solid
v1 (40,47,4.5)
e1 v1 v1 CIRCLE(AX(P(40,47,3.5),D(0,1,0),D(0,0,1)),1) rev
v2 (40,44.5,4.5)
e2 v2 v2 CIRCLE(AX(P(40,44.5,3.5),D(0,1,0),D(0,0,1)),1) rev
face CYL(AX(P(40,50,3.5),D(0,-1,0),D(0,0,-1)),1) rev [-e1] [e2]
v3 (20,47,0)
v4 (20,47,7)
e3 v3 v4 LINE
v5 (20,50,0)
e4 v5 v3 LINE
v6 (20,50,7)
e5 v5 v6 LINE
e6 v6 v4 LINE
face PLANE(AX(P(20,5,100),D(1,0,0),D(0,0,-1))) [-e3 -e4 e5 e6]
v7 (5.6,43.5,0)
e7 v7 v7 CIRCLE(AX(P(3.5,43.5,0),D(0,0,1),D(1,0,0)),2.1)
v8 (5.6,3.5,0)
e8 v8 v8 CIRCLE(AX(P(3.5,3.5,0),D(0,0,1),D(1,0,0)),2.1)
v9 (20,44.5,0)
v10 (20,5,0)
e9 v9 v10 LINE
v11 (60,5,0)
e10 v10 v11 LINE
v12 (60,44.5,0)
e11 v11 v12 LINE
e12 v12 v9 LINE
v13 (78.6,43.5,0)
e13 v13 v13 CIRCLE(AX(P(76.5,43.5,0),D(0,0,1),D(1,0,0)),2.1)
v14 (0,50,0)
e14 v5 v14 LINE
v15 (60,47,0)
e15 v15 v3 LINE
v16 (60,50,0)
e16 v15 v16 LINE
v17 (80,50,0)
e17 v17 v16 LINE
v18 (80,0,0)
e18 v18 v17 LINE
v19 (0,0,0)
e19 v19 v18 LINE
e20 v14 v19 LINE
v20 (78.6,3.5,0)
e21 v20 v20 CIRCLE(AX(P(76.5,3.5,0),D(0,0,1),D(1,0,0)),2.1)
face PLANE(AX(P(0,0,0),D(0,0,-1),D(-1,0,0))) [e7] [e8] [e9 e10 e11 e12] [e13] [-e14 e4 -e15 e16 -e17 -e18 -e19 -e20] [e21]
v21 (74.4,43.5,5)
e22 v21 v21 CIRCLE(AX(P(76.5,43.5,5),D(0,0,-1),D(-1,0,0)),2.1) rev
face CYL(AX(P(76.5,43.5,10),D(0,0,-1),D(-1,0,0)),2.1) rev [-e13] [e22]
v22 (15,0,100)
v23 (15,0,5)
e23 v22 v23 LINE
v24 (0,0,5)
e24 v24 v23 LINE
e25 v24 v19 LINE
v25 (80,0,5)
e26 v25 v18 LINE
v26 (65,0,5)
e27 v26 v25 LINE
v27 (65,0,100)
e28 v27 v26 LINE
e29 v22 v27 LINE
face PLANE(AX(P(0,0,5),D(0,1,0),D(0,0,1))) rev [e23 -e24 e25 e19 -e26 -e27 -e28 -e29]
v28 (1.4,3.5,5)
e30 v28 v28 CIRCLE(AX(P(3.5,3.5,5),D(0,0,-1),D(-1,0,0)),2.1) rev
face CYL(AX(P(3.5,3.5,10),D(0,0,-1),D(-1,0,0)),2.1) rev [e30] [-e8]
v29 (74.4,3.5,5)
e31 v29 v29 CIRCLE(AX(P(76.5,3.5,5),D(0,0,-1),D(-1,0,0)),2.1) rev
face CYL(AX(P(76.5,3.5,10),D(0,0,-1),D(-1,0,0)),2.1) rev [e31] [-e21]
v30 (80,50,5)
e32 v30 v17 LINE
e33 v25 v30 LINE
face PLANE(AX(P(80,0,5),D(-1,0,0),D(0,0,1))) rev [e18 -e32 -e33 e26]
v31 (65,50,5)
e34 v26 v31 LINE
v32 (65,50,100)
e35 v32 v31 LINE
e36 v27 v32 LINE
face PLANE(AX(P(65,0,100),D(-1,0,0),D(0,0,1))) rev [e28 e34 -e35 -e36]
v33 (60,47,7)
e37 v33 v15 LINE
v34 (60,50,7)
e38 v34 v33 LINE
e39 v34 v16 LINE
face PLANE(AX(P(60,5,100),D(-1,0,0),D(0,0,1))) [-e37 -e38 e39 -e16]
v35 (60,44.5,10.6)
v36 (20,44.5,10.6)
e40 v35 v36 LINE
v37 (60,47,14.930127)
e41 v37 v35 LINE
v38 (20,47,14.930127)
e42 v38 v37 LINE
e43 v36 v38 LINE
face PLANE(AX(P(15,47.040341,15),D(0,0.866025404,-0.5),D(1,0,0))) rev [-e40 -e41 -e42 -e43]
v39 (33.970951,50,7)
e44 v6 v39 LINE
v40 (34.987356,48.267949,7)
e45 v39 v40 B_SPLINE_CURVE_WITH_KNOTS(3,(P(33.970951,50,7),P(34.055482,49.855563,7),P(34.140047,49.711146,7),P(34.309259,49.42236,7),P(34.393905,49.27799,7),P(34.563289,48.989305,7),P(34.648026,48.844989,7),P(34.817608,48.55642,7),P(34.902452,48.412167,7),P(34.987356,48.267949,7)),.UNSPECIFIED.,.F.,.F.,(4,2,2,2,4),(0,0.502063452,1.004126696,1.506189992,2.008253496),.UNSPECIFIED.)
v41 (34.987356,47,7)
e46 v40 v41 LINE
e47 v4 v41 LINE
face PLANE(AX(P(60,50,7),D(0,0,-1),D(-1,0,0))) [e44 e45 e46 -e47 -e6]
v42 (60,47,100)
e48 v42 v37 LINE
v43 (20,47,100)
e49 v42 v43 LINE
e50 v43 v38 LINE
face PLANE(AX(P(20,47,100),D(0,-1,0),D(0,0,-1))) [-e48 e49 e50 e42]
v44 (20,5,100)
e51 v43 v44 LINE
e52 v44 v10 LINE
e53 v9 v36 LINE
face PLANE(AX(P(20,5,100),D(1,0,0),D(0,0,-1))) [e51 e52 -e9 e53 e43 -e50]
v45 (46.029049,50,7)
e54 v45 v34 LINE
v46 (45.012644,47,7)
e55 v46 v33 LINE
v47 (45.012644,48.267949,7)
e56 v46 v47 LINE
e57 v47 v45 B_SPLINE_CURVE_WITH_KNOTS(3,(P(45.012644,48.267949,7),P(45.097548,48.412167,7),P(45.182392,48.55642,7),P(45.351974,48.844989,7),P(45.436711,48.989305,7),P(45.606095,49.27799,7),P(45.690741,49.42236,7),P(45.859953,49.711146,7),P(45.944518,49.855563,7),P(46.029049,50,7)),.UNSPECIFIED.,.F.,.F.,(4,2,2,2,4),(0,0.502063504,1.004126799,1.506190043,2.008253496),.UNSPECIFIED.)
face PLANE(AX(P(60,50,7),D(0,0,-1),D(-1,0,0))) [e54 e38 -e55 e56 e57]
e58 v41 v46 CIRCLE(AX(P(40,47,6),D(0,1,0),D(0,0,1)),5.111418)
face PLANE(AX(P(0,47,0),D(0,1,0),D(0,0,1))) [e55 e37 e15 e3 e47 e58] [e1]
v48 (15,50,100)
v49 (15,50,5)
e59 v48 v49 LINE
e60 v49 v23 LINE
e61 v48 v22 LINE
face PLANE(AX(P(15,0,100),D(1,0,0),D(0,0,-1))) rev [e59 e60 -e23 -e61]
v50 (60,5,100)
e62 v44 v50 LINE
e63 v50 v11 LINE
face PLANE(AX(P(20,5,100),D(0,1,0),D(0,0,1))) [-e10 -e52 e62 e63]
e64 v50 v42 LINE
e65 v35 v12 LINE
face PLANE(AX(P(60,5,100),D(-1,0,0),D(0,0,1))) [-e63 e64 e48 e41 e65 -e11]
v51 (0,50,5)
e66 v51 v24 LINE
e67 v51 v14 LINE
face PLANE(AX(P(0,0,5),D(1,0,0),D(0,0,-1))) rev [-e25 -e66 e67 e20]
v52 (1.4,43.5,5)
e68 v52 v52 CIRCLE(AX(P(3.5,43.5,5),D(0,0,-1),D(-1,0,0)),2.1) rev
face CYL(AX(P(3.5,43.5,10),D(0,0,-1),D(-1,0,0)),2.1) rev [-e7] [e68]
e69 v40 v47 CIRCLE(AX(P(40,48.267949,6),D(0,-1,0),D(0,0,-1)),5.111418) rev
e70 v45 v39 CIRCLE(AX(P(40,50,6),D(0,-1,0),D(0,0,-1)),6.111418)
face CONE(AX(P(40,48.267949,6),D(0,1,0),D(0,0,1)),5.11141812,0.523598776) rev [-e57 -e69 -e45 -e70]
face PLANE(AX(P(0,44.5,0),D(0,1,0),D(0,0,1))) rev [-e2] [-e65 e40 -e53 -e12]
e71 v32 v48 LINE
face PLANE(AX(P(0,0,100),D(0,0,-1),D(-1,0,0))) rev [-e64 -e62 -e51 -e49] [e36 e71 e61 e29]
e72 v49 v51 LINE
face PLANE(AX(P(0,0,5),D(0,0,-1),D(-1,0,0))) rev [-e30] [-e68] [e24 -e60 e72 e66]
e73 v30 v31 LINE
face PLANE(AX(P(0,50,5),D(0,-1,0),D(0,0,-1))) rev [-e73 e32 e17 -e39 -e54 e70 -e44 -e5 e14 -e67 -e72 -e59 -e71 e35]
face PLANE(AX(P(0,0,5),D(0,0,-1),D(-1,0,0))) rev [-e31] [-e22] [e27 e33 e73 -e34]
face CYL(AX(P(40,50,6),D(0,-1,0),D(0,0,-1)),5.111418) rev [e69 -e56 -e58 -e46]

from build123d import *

# Parameters (mm, degrees)
SKETCH_1_W          = 80
SKETCH_1_H          = 50
EXTRUDE_1_DEPTH     = 5
SKETCH_2_W          = 50
SKETCH_2_H          = 50
EXTRUDE_2_DEPTH     = 100
SKETCH_4_W          = 40
SKETCH_4_H          = 42
CUT_EXTRUDE_1_DEPTH = 138.477270849
SKETCH_5_R          = 2.1
CUT_EXTRUDE_2_DEPTH = 10
CUT_EXTRUDE_START   = 10
SKETCH_7_W          = 40
SKETCH_7_H          = 7
CUT_EXTRUDE_7_DEPTH = 128.477270849
EXTRUDE_START       = 44.5
SKETCH_8_W          = 50
SKETCH_8_H          = 15
EXTRUDE_6_DEPTH     = 2.5
SKETCH_9_R          = 1
CUT_EXTRUDE_8_DEPTH = 128.477270849
CHAMFER_2_SIZE      = 4.4
CHAMFER_2_SIZE_2    = 2.540341184
CUT_EXTRUDE_START_2 = 47
SKETCH_14_R         = 5.11141812
CUT_EXTRUDE_9_DEPTH = 91.477270849
CHAMFER_3_SIZE      = 1
CHAMFER_3_SIZE2     = 1.732050808


with BuildPart() as part:
    # 草圖1 → 填料-伸長1 (new body)
    with BuildSketch(Plane.XY):
        with Locations((40, 25)):
            Rectangle(SKETCH_1_W, SKETCH_1_H)
    extrude(amount=EXTRUDE_1_DEPTH)

    # 草圖2 → 填料-伸長2 (add)
    with BuildSketch(Plane.XY):
        with Locations((40, 25)):
            Rectangle(SKETCH_2_W, SKETCH_2_H)
    extrude(amount=EXTRUDE_2_DEPTH)

    # 草圖4 → 除料-伸長1 (cut, through all)
    with BuildSketch(Plane.XY):
        with Locations((40, 26)):
            Rectangle(SKETCH_4_W, SKETCH_4_H)
    extrude(amount=CUT_EXTRUDE_1_DEPTH, mode=Mode.SUBTRACT)

    # 草圖5 → 除料-伸長2 (cut)
    with BuildSketch(Plane.XY):
        with Locations(Location((76.5, 3.5, 0), (0, 0, 180))):
            Circle(SKETCH_5_R)
        with Locations(Location((76.5, 43.5, 0), (0, 0, 180))):
            Circle(SKETCH_5_R)
        with Locations(Location((3.5, 3.5, 0), (0, 0, 180))):
            Circle(SKETCH_5_R)
        with Locations(Location((3.5, 43.5, 0), (0, 0, 180))):
            Circle(SKETCH_5_R)
    extrude(amount=CUT_EXTRUDE_2_DEPTH, mode=Mode.SUBTRACT)

    # 草圖7 → 除料-伸長7 (cut, through all)
    with BuildSketch(Plane(origin=(0, 0, 0), x_dir=(1, 0, 0), z_dir=(0, 1, 0)).offset(CUT_EXTRUDE_START)):
        with Locations((40, -3.5)):
            Rectangle(SKETCH_7_W, SKETCH_7_H)
    extrude(amount=CUT_EXTRUDE_7_DEPTH, mode=Mode.SUBTRACT)

    # 草圖8 → 填料-伸長6 (add)
    with BuildSketch(Plane(origin=(0, 0, 0), x_dir=(1, 0, 0), z_dir=(0, 1, 0)).offset(EXTRUDE_START)):
        with Locations((40, -7.5)):
            Rectangle(SKETCH_8_W, SKETCH_8_H)
    extrude(amount=EXTRUDE_6_DEPTH)

    # 草圖9 → 除料-伸長8 (cut, through all)
    with BuildSketch(Plane(origin=(0, 0, 0), x_dir=(1, 0, 0), z_dir=(0, 1, 0)).offset(CUT_EXTRUDE_START)):
        with Locations(Location((40, -3.5, 0), (0, 0, 270))):
            Circle(SKETCH_9_R)
    extrude(amount=CUT_EXTRUDE_8_DEPTH, mode=Mode.SUBTRACT)

    # 導角2
    # the kernel refuses this chamfer: 4.4, 2.540341184 mm, written as the material it takes off along each edge
    with BuildSketch(Plane(origin=(60, 44.5, 15), x_dir=(0, -0.01932676561270091, -0.9998132206222078), z_dir=(-1, 0, 0))) as chamfer_2_piece_1_section:
        Polygon((CHAMFER_2_SIZE * 0.999813220622, -CHAMFER_2_SIZE * 0.0193267656127), (-CHAMFER_2_SIZE_2 * 0.019326765616, -CHAMFER_2_SIZE_2 * 0.999813220793), (0, 0), align=None)
    chamfer_2_piece_1 = extrude(amount=40, mode=Mode.PRIVATE)
    chamfer_2_piece_1 = split(chamfer_2_piece_1, bisect_by=Plane(origin=(40, 47, 13.532969249), z_dir=(0, -1, 0)), keep=Keep.TOP, mode=Mode.PRIVATE)
    add(chamfer_2_piece_1, mode=Mode.SUBTRACT)

    # 草圖14 → 除料-伸長9 (cut, through all)
    with BuildSketch(Plane(origin=(0, 0, 0), x_dir=(1, 0, 0), z_dir=(0, 1, 0)).offset(CUT_EXTRUDE_START_2)):
        with Locations((40, -6)):
            Circle(SKETCH_14_R)
    extrude(amount=CUT_EXTRUDE_9_DEPTH, mode=Mode.SUBTRACT)

    # 導角3
    chamfer_3_edges = [part.edges().sort_by_distance(p)[0] for p in [
        (40, 50, 11.11141812),
    ]]
    chamfer_3_side = [part.faces().sort_by_distance(p)[0] for p in [
        (40, 50, 51.481645062),
    ]]
    chamfer(chamfer_3_edges, length=CHAMFER_3_SIZE, length2=CHAMFER_3_SIZE2, reference=chamfer_3_side[0])


solid = part.part
